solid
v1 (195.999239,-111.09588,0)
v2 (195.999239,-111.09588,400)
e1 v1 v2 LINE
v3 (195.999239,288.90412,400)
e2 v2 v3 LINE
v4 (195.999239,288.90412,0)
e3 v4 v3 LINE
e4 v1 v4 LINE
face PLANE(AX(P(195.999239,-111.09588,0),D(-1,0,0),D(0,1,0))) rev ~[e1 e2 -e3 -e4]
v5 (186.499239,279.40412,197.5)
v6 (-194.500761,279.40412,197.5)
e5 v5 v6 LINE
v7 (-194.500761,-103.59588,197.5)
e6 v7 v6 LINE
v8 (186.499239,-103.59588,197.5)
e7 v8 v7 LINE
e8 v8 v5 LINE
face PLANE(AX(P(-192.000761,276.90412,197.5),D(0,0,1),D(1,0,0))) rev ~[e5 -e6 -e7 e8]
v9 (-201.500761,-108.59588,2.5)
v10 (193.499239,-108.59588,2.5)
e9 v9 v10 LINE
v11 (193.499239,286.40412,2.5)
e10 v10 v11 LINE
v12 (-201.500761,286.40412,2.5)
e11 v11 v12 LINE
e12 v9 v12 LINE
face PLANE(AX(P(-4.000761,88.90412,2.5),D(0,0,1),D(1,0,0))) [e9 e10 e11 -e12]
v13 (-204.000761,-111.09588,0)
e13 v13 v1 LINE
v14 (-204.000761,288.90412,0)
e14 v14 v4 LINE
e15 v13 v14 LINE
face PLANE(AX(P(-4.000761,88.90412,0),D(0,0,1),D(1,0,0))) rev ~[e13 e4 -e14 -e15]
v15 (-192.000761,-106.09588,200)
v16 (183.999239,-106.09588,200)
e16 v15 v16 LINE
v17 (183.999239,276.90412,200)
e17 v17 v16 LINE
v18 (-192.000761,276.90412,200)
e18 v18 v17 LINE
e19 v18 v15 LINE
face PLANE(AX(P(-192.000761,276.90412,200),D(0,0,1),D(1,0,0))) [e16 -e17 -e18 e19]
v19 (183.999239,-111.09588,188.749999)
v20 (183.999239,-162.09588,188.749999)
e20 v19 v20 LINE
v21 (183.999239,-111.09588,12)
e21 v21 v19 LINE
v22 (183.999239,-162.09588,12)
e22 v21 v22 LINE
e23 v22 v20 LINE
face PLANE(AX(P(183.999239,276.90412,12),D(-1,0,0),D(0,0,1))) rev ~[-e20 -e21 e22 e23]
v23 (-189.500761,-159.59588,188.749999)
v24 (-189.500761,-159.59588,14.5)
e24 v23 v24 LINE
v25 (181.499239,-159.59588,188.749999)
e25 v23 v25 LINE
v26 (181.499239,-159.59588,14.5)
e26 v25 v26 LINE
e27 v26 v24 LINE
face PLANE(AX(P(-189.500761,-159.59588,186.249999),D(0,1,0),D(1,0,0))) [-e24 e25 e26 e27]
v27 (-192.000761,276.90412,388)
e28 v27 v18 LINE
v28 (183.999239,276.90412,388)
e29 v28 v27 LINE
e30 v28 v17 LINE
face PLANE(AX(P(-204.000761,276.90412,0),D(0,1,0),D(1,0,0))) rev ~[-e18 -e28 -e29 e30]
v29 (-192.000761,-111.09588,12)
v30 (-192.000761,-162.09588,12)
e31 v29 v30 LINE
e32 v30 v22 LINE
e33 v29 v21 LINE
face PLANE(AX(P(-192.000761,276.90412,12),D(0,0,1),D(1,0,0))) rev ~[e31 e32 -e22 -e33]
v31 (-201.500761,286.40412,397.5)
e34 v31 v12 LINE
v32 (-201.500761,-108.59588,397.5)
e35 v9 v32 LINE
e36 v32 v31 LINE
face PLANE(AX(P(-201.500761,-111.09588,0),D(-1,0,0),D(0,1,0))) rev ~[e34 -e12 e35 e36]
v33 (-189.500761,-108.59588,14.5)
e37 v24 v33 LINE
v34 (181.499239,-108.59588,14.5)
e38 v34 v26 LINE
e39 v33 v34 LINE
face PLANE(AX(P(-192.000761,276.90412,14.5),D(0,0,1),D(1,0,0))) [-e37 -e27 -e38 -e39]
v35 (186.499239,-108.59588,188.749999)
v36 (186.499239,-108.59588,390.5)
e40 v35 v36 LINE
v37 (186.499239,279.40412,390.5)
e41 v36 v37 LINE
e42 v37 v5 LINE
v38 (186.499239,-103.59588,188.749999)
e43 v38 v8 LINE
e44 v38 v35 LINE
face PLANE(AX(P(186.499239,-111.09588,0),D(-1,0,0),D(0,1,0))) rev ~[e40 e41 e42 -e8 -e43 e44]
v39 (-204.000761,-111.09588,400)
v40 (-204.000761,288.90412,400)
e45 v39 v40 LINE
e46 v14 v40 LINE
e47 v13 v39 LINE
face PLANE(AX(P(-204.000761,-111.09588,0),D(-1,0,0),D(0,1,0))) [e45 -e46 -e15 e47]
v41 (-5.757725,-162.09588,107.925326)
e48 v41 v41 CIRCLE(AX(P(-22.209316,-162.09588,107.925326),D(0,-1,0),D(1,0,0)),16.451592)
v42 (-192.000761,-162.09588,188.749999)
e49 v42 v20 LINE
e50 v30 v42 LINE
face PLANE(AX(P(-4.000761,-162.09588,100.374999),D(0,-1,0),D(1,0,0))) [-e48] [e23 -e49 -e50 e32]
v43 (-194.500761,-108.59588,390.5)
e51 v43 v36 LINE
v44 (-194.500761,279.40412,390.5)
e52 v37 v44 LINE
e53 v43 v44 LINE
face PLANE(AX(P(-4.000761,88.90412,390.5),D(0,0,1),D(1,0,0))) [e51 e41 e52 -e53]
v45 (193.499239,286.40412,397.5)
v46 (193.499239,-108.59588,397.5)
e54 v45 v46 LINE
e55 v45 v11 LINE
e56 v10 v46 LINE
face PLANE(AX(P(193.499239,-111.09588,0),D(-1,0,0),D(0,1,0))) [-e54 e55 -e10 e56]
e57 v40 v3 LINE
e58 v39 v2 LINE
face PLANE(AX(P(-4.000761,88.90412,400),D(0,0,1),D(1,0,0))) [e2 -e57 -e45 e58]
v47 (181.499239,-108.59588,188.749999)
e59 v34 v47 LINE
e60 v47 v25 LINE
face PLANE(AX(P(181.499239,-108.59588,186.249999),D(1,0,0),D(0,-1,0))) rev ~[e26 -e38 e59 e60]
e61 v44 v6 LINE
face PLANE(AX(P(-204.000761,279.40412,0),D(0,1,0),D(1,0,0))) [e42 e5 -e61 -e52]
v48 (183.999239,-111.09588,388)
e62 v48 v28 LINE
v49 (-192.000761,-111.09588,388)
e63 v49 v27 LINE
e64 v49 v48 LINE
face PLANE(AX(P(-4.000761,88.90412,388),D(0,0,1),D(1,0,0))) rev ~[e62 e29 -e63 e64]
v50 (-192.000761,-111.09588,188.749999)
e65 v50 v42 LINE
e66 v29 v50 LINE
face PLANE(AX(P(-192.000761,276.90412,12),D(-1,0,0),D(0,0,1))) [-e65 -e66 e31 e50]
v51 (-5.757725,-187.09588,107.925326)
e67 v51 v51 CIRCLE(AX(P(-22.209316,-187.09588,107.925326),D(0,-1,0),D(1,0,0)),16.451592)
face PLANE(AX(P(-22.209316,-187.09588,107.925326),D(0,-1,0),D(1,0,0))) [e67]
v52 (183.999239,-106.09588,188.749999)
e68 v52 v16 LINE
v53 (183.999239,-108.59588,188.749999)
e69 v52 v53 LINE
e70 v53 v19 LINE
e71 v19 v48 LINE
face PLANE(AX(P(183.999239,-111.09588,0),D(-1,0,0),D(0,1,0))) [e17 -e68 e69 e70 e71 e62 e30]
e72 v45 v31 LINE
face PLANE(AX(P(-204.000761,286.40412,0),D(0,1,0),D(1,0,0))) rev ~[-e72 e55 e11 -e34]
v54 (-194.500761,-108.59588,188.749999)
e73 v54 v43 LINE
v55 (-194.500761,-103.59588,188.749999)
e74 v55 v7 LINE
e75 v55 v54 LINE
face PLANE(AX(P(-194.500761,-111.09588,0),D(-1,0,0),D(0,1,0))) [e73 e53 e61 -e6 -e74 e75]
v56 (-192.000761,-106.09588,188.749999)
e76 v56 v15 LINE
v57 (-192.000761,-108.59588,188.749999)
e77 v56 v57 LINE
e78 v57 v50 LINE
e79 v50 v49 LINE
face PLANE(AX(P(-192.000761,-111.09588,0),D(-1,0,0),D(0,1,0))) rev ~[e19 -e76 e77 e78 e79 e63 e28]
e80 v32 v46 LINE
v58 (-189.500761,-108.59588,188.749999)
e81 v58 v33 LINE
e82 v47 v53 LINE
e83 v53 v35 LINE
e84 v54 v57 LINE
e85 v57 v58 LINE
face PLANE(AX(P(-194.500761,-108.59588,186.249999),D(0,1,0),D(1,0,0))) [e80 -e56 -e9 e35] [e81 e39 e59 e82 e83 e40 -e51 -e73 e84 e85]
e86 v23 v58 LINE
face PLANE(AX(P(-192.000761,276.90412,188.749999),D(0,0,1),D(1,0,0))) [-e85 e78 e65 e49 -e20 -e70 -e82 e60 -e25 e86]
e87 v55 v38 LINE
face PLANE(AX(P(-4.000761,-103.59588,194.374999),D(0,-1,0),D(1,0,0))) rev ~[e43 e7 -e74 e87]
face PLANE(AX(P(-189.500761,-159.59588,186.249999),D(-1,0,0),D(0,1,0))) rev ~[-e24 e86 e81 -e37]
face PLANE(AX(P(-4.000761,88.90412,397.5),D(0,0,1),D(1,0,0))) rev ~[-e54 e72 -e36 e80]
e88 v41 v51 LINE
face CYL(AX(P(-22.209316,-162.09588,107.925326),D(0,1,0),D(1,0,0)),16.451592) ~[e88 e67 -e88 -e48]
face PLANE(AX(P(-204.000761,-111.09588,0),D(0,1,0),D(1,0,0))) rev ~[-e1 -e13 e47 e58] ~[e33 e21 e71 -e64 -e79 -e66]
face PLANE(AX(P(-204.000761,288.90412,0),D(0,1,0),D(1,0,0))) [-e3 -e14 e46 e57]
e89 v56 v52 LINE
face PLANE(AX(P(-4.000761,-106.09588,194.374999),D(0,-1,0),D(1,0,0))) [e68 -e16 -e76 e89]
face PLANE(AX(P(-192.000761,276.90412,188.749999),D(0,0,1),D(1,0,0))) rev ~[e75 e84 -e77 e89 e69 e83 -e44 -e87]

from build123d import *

# Parameters (mm, degrees)
F0_W      = 400
F0_H      = 400
F1_DEPTH  = 400
F2_T      = -12
F4_W      = 376
F4_H      = 11.2500011921
F5_DEPTH  = 383
F6_W      = 376
F6_H      = 176.7499988079
F7_DEPTH  = 439
F8_T      = -2.5
F9_R      = 16.4515915788
F10_DEPTH = 25


# Not quite as in the source:
# - a shell that OpenCascade refuses in one call is made with other operations: the cavity is built on its own and cut out


with BuildPart() as f1:
    # F0 (on Top) → F1 (new body)
    with BuildSketch(Plane.XY):
        with Locations((-4.0007606149, 88.9041203893)):
            Rectangle(F0_W, F0_H)
    extrude(amount=F1_DEPTH)

    # F2
    f2_openings = [f1.faces().sort_by_distance(p)[0] for p in [
        (-4.000761, -111.09588, 200),
    ]]
    offset(amount=F2_T, openings=f2_openings)

    # F4 (on face) → F5 (join)
    with BuildSketch(Plane.XZ.offset(-276.9041203893)):
        with Locations((-4.0007606149, 194.374999404)):
            Rectangle(F4_W, F4_H)
    extrude(amount=F5_DEPTH)

    # F6 (on face) → F7 (join)
    with BuildSketch(Plane.XZ.offset(-276.9041203893)):
        with Locations((-4.0007606149, 100.374999404)):
            Rectangle(F6_W, F6_H)
    extrude(amount=F7_DEPTH)

    # F8: a shell. OpenCascade refuses it in one call, so the cavity is built on its own and cut out:
    # the body offset inwards by the wall thickness, plus a prism from it out through each open face.
    f8_core = offset(f1.part, amount=F8_T, kind=Kind.INTERSECTION, mode=Mode.PRIVATE)
    f8_exits = [f8_core.faces().sort_by_distance(p)[0] for p in [
        (-4.000761, -131.534658, 186.249999),
    ]]
    add(f8_core, mode=Mode.SUBTRACT)
    extrude(f8_exits, amount=-F8_T, mode=Mode.SUBTRACT)

    # F9 (on face) → F10 (join)
    with BuildSketch(Plane.XZ.offset(162.0958796107)):
        with Locations((-22.2093164921, 107.9253256321)):
            Circle(F9_R)
    extrude(amount=F10_DEPTH)


solid = f1.part
